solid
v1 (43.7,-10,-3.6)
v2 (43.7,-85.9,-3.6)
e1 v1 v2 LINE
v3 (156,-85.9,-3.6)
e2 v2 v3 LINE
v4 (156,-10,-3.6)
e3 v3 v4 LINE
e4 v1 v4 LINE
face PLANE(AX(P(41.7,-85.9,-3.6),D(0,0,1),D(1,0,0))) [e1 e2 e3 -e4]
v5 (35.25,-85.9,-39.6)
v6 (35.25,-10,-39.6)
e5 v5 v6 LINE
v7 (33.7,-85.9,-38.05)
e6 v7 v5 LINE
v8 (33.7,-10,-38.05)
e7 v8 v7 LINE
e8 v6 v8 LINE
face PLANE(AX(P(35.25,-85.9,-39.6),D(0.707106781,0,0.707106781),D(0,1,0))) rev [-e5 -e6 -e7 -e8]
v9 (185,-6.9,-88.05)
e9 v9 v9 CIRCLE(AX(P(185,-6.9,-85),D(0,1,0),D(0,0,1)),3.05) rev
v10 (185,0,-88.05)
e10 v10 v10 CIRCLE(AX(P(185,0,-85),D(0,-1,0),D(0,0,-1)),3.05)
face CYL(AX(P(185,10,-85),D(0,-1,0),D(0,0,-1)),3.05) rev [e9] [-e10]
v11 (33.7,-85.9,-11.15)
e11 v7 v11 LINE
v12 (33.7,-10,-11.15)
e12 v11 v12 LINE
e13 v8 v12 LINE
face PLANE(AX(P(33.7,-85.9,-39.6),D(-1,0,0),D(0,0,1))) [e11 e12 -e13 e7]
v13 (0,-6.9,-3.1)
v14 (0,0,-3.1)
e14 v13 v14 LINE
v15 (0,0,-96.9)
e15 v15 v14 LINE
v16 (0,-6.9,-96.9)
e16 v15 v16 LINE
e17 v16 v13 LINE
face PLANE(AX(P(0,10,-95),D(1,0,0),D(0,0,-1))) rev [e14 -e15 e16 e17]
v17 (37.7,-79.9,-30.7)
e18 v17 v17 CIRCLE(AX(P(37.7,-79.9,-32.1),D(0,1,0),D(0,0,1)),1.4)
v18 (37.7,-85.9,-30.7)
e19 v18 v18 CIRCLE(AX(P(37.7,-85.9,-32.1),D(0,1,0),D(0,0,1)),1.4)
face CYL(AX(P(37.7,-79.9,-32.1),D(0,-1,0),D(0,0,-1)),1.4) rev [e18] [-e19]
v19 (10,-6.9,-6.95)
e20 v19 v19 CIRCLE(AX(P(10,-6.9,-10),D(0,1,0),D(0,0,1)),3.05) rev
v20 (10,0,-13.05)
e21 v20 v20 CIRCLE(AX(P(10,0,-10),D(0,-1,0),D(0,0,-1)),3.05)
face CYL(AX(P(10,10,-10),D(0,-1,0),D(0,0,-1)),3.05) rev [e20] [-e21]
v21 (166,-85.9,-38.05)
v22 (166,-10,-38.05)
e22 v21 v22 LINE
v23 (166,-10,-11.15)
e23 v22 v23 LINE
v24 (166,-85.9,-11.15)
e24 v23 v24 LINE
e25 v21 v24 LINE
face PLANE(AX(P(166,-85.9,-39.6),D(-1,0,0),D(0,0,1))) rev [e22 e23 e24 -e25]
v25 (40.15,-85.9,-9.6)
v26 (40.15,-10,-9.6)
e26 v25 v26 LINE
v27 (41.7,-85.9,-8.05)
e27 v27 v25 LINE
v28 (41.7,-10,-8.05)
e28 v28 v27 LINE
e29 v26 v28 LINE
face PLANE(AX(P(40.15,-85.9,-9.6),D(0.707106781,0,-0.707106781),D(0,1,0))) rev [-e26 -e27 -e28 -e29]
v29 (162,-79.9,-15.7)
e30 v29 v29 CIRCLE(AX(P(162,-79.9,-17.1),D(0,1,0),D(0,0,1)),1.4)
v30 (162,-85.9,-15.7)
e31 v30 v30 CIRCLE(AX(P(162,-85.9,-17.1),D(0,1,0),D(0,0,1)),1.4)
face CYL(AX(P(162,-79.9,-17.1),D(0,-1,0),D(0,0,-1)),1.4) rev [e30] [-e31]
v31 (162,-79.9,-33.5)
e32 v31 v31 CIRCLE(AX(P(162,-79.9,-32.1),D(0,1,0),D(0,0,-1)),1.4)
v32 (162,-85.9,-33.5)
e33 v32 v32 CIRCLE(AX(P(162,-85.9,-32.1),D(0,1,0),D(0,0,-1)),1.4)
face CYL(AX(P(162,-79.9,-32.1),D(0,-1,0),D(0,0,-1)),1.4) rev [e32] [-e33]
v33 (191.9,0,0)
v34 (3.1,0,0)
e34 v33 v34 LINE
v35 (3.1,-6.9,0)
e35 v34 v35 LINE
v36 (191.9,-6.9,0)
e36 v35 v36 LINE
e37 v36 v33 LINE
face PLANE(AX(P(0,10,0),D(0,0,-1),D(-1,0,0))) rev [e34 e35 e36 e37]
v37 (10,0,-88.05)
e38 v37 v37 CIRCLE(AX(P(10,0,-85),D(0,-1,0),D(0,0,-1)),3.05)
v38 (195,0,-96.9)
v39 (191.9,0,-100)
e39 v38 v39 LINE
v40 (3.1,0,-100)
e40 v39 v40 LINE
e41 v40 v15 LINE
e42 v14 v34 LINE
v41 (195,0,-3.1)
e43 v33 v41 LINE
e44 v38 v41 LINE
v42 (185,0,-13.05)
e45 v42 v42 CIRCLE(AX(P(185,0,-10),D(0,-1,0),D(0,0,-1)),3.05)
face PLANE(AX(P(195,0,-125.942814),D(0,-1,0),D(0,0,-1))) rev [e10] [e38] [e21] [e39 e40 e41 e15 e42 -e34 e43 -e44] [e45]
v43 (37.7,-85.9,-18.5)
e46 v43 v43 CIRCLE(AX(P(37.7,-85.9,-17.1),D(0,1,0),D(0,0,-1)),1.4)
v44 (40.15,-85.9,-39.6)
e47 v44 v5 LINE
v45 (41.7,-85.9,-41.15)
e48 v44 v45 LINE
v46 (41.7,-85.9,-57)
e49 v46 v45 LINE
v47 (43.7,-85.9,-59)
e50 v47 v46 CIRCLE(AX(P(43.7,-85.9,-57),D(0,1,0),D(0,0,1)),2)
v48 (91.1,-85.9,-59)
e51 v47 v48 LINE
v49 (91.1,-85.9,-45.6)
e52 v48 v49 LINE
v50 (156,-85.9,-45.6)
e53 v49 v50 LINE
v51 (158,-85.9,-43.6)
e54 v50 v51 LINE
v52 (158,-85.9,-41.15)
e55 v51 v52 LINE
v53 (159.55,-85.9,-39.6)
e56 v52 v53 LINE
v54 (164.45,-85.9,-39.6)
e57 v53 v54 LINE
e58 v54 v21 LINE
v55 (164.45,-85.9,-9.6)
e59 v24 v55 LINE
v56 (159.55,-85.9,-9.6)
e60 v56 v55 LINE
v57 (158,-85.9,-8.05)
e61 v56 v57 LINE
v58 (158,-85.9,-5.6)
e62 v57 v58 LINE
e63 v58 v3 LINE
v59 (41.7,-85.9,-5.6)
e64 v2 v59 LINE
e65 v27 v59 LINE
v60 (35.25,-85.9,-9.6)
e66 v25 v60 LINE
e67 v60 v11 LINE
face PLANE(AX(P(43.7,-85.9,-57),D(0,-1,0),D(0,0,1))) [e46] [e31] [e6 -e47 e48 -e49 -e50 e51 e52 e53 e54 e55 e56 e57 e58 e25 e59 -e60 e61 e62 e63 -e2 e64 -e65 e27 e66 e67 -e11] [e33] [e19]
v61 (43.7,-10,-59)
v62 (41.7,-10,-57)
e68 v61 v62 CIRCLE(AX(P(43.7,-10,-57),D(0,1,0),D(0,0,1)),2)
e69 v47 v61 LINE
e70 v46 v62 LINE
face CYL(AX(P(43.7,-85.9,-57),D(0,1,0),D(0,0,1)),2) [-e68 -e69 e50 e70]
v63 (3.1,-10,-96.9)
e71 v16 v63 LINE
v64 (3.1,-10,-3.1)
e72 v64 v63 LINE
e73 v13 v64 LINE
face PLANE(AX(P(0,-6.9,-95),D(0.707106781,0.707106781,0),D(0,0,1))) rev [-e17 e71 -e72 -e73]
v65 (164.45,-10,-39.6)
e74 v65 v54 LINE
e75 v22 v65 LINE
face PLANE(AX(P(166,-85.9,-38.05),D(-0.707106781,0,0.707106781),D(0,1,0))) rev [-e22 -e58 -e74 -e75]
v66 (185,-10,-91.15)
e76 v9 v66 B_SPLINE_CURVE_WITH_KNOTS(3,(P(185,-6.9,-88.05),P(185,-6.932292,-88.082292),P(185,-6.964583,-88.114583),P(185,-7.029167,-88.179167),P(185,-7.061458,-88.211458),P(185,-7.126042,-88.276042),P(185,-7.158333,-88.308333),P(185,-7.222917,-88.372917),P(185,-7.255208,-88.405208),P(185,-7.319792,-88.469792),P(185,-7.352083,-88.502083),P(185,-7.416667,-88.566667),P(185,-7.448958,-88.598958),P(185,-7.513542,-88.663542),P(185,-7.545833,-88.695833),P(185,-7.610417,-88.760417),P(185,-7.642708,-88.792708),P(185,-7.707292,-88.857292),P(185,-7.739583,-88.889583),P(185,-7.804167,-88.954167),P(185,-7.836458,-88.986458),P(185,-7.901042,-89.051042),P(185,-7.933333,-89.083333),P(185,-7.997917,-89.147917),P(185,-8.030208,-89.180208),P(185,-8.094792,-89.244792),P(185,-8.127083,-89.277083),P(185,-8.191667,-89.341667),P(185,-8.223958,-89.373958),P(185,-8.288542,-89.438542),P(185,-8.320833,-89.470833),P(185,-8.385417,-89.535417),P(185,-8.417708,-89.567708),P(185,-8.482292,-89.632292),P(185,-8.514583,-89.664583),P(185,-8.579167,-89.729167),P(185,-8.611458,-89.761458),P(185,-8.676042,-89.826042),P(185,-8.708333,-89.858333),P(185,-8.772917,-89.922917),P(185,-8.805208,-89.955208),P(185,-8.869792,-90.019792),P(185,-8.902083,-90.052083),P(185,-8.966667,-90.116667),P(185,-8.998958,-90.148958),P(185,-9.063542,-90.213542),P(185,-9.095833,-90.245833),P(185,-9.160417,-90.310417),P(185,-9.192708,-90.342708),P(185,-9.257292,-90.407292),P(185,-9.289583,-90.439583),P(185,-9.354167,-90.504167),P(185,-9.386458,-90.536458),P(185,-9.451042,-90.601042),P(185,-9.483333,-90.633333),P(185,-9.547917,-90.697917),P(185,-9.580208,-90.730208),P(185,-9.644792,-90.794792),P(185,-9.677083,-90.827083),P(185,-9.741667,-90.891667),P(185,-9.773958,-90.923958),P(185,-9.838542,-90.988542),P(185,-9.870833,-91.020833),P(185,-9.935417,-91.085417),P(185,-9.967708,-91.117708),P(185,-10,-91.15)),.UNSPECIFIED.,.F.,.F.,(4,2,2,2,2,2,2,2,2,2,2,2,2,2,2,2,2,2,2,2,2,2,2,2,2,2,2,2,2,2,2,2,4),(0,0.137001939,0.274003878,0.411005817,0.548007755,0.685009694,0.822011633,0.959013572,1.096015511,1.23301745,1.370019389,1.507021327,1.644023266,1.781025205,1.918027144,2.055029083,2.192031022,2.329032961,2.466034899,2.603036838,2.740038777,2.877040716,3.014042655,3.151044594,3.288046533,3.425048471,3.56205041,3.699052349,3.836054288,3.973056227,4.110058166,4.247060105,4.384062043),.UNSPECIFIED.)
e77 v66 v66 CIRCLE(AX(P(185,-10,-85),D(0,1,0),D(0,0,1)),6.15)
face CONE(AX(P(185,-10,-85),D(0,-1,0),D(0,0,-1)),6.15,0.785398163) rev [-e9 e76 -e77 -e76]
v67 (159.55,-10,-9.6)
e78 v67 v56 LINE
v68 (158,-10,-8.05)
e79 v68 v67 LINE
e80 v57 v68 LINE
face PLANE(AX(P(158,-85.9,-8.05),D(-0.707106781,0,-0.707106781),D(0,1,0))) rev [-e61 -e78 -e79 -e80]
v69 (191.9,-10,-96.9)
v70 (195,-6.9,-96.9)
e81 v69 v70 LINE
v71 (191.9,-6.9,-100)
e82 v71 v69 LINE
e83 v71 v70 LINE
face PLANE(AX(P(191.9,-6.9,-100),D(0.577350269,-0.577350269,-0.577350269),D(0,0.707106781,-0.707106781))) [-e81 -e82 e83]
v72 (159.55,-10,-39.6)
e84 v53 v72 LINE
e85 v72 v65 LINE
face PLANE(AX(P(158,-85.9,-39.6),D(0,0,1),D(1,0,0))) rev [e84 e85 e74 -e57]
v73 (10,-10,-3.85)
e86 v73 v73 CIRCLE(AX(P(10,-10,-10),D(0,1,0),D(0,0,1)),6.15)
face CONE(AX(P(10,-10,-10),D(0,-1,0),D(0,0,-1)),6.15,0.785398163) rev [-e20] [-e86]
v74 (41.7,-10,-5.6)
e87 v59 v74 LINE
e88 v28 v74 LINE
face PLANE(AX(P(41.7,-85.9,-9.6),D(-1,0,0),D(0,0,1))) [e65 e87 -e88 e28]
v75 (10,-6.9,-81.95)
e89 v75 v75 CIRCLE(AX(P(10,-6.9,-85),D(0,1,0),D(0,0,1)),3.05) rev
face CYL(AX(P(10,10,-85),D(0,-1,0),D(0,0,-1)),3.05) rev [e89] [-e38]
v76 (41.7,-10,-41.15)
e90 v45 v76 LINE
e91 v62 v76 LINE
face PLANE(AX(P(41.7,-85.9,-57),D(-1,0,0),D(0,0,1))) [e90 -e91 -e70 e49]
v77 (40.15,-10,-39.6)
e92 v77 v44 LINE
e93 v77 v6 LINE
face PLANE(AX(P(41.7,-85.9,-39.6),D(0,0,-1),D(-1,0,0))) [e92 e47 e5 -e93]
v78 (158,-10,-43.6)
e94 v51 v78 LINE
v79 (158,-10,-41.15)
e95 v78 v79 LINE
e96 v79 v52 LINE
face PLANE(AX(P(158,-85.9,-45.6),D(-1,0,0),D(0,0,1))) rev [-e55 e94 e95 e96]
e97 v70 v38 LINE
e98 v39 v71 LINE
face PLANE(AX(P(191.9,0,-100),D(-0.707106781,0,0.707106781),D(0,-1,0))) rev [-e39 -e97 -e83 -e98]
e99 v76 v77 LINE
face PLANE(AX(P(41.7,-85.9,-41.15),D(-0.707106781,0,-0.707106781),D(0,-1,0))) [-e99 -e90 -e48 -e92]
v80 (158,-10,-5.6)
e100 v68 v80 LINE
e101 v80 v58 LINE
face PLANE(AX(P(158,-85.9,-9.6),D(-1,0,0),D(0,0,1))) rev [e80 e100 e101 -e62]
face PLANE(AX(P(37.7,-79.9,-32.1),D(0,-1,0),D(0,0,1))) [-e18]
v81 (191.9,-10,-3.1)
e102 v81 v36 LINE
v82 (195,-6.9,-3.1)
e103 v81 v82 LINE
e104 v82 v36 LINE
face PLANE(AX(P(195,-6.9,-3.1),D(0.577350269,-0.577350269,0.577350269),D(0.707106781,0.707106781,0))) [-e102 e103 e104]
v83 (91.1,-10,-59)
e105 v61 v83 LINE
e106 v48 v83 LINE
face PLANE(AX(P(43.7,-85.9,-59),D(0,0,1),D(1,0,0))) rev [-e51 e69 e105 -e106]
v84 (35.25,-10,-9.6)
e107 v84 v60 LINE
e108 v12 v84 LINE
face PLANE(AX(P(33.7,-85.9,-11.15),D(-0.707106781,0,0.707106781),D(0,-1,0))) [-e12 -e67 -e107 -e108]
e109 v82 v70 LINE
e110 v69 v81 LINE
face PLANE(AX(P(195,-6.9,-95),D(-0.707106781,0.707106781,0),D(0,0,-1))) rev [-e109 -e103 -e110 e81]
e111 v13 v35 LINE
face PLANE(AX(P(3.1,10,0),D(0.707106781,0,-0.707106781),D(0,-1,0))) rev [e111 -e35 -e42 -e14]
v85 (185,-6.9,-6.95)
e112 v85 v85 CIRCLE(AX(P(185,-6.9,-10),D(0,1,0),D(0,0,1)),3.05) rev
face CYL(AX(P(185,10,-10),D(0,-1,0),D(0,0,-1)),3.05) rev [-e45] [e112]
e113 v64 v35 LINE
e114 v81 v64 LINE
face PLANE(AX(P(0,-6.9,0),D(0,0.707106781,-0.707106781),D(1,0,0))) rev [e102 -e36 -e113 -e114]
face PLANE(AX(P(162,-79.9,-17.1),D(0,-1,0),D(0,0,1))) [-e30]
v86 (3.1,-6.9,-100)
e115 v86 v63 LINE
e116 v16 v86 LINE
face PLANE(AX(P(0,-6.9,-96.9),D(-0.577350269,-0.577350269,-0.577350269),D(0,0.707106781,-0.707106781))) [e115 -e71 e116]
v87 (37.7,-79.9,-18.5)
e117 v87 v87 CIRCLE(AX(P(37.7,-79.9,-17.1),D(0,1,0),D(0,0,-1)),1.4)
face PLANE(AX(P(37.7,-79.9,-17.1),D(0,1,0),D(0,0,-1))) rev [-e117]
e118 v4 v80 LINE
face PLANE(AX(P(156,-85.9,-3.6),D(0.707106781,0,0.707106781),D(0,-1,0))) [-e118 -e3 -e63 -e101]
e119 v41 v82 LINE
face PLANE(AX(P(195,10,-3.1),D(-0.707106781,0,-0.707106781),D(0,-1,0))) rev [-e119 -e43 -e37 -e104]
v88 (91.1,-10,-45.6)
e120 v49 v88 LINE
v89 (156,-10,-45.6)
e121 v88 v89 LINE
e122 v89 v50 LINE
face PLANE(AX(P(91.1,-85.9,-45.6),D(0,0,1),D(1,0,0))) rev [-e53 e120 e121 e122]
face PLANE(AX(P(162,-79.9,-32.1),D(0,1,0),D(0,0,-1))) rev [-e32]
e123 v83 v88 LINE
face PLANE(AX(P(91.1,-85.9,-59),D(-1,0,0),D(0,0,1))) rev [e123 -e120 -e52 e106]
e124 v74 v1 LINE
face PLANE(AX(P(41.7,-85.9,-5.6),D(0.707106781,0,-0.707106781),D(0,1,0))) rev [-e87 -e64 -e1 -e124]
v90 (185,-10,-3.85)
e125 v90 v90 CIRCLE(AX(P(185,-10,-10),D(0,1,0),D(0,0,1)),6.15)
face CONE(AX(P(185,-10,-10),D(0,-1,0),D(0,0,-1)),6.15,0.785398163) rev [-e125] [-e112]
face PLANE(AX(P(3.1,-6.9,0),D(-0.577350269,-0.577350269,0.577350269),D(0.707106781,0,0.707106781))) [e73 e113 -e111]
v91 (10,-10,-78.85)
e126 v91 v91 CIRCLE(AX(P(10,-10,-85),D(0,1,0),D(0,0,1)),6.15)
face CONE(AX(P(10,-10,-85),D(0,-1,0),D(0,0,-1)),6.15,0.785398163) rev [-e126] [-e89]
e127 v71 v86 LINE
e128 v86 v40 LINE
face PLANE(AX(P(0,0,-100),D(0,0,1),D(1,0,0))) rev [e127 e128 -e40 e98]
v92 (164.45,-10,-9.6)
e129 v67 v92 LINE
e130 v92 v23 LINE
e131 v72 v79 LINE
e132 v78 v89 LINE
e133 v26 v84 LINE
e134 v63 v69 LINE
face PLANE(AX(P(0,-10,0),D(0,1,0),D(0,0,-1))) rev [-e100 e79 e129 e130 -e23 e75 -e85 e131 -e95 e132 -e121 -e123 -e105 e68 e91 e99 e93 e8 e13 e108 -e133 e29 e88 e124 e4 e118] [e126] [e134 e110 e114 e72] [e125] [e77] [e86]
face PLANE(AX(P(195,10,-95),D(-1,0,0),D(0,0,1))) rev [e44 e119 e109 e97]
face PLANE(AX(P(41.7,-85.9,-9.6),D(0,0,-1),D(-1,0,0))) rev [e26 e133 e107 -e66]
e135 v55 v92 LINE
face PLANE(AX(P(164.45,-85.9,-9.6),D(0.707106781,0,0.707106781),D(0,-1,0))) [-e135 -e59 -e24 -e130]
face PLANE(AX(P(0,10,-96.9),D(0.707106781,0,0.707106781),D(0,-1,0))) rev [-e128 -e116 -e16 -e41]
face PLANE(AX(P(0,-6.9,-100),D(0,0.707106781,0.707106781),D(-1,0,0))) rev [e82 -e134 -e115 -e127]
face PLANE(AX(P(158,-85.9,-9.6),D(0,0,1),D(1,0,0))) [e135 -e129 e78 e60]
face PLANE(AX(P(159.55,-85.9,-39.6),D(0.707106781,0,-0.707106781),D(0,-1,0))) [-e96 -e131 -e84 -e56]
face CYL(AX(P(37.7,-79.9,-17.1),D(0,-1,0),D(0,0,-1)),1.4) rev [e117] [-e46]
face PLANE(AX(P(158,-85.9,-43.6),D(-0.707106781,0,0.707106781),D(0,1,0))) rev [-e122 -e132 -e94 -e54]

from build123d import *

# Parameters (mm, degrees)
SKETCH1_R                = 3.05
BOSS_EXTRUDE1_DEPTH      = 10
BOSS_EXTRUDE2_DEPTH      = 75.9
SKETCH3_R                = 1.4
CUT_EXTRUDE1_DEPTH       = 6
CHAMFER1_SIZE            = 1.55
CHAMFER2_SIZE            = 2
CHAMFER1_OF_MIRROR1_SIZE = 1.55
CHAMFER2_OF_MIRROR1_SIZE = 2
SKETCH4_W                = 135.019613606
SKETCH4_H                = 106.174514336
CUT_EXTRUDE2_DEPTH       = 236.5929965
SKETCH5_W                = 195
SKETCH5_H                = 0.5
CUT_EXTRUDE3_DEPTH       = 233.133711468
CHAMFER3_SIZE            = 3.1
CHAMFER4_SIZE            = 3.1


with BuildPart() as part:
    # Sketch1 → Boss-Extrude1 (new body)
    with BuildSketch(Plane(origin=(0, 0, 0), x_dir=(1, 0, 0), z_dir=(0, 1, 0))):
        Polygon((0, 0), (195, 0), (195, 95), (195, 100.5), (0, 100.5), (0, 95), align=None)
        with Locations((10, 85)):
            Circle(SKETCH1_R, mode=Mode.SUBTRACT)
        with Locations((185, 85)):
            Circle(SKETCH1_R, mode=Mode.SUBTRACT)
        with Locations((185, 10)):
            Circle(SKETCH1_R, mode=Mode.SUBTRACT)
        with Locations((10, 10)):
            Circle(SKETCH1_R, mode=Mode.SUBTRACT)
    boss_extrude1 = extrude(amount=BOSS_EXTRUDE1_DEPTH)

    # Sketch2 → Boss-Extrude2 (add)
    with BuildSketch(Plane(origin=(0, 10, 0), x_dir=(1, 0, 0), z_dir=(0, 1, 0))):
        with BuildLine():
            Line((43.7, 59), (91.1, 59))
            Line((91.1, 59), (91.1, 45.6))
            Line((91.1, 45.6), (158, 45.6))
            Line((158, 45.6), (158, 39.6))
            Line((158, 39.6), (166, 39.6))
            Line((166, 39.6), (166, 9.6))
            Line((166, 9.6), (158, 9.6))
            Line((158, 9.6), (158, 3.6))
            Line((158, 3.6), (41.7, 3.6))
            Line((41.7, 3.6), (41.7, 9.6))
            Line((41.7, 9.6), (33.7, 9.6))
            Line((33.7, 9.6), (33.7, 39.6))
            Line((33.7, 39.6), (41.7, 39.6))
            Line((41.7, 39.6), (41.7, 57))
            ThreePointArc((41.7, 57), (42.285786438, 58.414213562), (43.7, 59))
        make_face()
    boss_extrude2 = extrude(amount=BOSS_EXTRUDE2_DEPTH)

    # Sketch3 → Cut-Extrude1 (cut)
    with BuildSketch(Plane(origin=(0, 85.9, 0), x_dir=(1, 0, 0), z_dir=(0, 1, 0))):
        with Locations((37.7, 32.1)):
            Circle(SKETCH3_R)
        with Locations((37.7, 17.1)):
            Circle(SKETCH3_R)
        with Locations((162, 17.1)):
            Circle(SKETCH3_R)
        with Locations((162, 32.1)):
            Circle(SKETCH3_R)
    cut_extrude1 = extrude(amount=-CUT_EXTRUDE1_DEPTH, mode=Mode.SUBTRACT)

    # Chamfer1
    chamfer1_edges = [part.edges().sort_by_distance(p)[0] for p in [
        (41.7, 47.95, -9.6),
        (33.7, 47.95, -9.6),
        (33.7, 47.95, -39.6),
        (41.7, 47.95, -39.6),
        (166, 47.95, -9.6),
        (158, 47.95, -9.6),
        (158, 47.95, -39.6),
        (166, 47.95, -39.6),
    ]]
    chamfer(chamfer1_edges, length=CHAMFER1_SIZE)

    # Chamfer2
    chamfer2_edges = [part.edges().sort_by_distance(p)[0] for p in [
        (41.7, 47.95, -3.6),
        (158, 47.95, -45.6),
        (158, 47.95, -3.6),
    ]]
    chamfer(chamfer2_edges, length=CHAMFER2_SIZE)

    # Mirror1: Boss-Extrude1, Boss-Extrude2, Cut-Extrude1 across plane
    add(boss_extrude1.mirror(Plane(origin=(0, 0, 0), x_dir=(0, 0, 1), z_dir=(0, -1, 0))))
    add(boss_extrude2.mirror(Plane(origin=(0, 0, 0), x_dir=(0, 0, 1), z_dir=(0, -1, 0))))
    add(cut_extrude1.mirror(Plane(origin=(0, 0, 0), x_dir=(0, 0, 1), z_dir=(0, -1, 0))), mode=Mode.SUBTRACT)

    # Chamfer1 of Mirror1
    chamfer1_of_mirror1_edges = [part.edges().sort_by_distance(p)[0] for p in [
        (41.7, -47.95, -9.6),
        (33.7, -47.95, -9.6),
        (33.7, -47.95, -39.6),
        (41.7, -47.95, -39.6),
        (166, -47.95, -9.6),
        (158, -47.95, -9.6),
        (158, -47.95, -39.6),
        (166, -47.95, -39.6),
    ]]
    chamfer(chamfer1_of_mirror1_edges, length=CHAMFER1_OF_MIRROR1_SIZE)

    # Chamfer2 of Mirror1
    chamfer2_of_mirror1_edges = [part.edges().sort_by_distance(p)[0] for p in [
        (41.7, -47.95, -3.6),
        (158, -47.95, -45.6),
        (158, -47.95, -3.6),
    ]]
    chamfer(chamfer2_of_mirror1_edges, length=CHAMFER2_OF_MIRROR1_SIZE)

    # Sketch4 → Cut-Extrude2 (cut, through all)
    with BuildSketch(Plane.ZY):
        with Locations((-58.433006885, 53.087257168)):
            Rectangle(SKETCH4_W, SKETCH4_H)
    extrude(amount=-CUT_EXTRUDE2_DEPTH, mode=Mode.SUBTRACT)

    # Sketch5 → Cut-Extrude3 (cut, through all)
    with BuildSketch(Plane.XZ.offset(10)):
        with Locations((97.5, -100.25)):
            Rectangle(SKETCH5_W, SKETCH5_H)
    extrude(amount=-CUT_EXTRUDE3_DEPTH, mode=Mode.SUBTRACT)

    # Chamfer3
    chamfer3_edges = [part.edges().sort_by_distance(p)[0] for p in [
        (181.95, -10, -10),
        (181.95, -10, -85),
        (6.95, -10, -85),
        (6.95, -10, -10),
    ]]
    chamfer(chamfer3_edges, length=CHAMFER3_SIZE)

    # Chamfer4
    chamfer4_edges = [part.edges().sort_by_distance(p)[0] for p in [
        (0, -5, 0),
        (0, -5, -100),
        (195, -5, 0),
        (195, -5, -100),
        (195, -10, -50),
        (97.5, -10, 0),
        (97.5, -10, -100),
        (0, -10, -50),
    ]]
    chamfer(chamfer4_edges, length=CHAMFER4_SIZE)


solid = part.part
